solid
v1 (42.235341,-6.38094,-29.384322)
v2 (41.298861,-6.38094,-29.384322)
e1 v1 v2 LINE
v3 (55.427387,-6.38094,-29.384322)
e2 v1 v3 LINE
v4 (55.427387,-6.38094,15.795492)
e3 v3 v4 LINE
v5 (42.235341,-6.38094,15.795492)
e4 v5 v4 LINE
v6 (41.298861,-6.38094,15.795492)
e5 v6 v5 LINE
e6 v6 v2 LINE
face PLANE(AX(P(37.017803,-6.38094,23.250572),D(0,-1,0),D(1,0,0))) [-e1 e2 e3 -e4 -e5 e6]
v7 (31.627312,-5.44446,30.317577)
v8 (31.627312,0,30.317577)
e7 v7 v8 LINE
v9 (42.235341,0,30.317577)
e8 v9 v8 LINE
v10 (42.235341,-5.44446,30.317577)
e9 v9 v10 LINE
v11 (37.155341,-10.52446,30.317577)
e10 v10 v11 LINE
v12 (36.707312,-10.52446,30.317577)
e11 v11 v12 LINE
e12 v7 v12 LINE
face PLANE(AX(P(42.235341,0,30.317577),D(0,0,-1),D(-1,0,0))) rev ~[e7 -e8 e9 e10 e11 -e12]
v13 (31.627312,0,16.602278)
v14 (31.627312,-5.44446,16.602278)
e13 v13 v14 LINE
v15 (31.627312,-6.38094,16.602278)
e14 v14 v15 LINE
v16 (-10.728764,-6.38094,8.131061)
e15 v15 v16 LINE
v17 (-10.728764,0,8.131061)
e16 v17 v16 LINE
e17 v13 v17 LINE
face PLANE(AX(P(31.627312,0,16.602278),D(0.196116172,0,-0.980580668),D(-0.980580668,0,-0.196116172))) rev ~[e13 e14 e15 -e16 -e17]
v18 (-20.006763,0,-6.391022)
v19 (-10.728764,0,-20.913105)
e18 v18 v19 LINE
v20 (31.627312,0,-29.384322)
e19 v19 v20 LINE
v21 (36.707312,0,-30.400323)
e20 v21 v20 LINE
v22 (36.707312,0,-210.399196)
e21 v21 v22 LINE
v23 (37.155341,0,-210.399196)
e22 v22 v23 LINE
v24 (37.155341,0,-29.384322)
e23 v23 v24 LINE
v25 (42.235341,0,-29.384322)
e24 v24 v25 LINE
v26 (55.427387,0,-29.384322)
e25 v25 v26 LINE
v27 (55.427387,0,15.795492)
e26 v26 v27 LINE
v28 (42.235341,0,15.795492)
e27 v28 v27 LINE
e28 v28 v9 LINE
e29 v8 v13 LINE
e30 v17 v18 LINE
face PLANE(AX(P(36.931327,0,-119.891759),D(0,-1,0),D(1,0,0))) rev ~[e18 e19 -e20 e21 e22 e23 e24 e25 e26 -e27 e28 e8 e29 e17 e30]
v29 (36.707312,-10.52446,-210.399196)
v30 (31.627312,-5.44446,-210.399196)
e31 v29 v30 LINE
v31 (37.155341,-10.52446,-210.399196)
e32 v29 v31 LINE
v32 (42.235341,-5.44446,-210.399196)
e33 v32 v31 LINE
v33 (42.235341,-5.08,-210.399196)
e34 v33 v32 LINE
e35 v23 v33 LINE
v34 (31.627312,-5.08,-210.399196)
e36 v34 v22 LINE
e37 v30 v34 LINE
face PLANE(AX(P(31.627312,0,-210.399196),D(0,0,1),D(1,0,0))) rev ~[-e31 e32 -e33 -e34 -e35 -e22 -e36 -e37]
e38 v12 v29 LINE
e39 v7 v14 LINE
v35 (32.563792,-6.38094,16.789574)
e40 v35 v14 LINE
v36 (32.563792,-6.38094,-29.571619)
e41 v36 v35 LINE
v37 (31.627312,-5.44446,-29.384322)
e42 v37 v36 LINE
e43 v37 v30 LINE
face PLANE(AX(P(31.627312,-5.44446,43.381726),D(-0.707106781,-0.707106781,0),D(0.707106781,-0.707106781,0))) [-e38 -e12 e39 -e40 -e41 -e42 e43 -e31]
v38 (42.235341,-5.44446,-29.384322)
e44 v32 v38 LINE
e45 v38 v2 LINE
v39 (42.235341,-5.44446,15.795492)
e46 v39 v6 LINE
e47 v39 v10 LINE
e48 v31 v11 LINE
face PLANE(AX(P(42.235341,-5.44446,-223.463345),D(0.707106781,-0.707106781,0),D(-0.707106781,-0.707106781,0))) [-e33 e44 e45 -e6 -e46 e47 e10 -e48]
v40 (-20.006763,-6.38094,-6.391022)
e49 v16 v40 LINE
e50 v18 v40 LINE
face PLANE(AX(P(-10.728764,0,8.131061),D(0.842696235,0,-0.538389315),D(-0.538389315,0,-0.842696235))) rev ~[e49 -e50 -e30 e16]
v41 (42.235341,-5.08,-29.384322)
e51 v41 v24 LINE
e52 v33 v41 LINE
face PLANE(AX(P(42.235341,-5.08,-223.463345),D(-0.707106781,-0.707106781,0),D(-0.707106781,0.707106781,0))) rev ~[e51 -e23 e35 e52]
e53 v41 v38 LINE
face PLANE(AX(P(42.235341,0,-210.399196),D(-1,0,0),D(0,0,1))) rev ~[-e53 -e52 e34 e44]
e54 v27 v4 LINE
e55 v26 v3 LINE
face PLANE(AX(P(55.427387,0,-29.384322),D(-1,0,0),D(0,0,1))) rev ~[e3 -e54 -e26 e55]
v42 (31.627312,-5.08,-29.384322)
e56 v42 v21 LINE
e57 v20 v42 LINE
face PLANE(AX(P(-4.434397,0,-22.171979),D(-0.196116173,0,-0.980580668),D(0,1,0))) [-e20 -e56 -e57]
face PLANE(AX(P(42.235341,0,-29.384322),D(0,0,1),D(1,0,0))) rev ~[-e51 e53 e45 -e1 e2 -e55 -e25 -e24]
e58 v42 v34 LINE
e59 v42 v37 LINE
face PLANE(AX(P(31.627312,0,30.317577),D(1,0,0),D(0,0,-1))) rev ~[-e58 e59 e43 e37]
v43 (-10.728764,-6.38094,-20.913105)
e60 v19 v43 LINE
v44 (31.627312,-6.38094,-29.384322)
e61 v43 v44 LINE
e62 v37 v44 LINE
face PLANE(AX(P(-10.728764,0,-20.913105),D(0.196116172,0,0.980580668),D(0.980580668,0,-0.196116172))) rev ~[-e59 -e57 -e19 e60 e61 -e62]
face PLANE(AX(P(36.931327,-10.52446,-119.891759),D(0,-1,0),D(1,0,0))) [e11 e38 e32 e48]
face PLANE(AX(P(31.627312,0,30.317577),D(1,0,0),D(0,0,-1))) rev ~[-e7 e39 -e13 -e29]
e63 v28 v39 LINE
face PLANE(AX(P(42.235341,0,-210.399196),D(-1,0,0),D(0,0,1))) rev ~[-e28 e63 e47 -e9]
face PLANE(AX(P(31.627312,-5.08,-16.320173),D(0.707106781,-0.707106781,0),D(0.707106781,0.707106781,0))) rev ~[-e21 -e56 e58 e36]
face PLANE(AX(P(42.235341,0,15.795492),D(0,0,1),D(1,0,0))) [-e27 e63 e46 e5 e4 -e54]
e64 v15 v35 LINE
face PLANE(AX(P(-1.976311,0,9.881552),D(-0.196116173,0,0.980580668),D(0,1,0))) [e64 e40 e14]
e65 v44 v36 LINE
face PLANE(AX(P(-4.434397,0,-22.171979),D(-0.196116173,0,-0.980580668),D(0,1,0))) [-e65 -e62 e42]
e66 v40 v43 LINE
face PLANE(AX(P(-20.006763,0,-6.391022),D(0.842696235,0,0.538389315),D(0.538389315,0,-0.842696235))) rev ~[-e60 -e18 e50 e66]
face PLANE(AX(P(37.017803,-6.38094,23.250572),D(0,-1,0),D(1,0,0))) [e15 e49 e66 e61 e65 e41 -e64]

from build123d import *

# Parameters (mm, degrees)
F0_W         = 10.6080286205
F0_H         = 181.0148730874
F1_DEPTH     = 10.52446
F0_W_2       = 13.1920464337
F0_H_2       = 45.1798141003
F2_DEPTH     = 6.38094
F3_T1_DEPTH  = 194.0790226663
F3_T6_DEPTH  = 266.8450713117
F3_T12_DEPTH = 266.8450713117
F3_T18_DEPTH = 266.8450713117
F3_T25_DEPTH = 266.8450713117
F3_T31_DEPTH = 266.8450713117
F3_T37_DEPTH = 266.8450713117
F3_T43_DEPTH = 266.8450713117
F3_T49_DEPTH = 266.8450713117
F3_T56_DEPTH = 266.8450713117
F3_T62_DEPTH = 266.8450713117
F3_T68_DEPTH = 207.1431722451


# Not quite as in the source:
# - a fillet or chamfer that OpenCascade refuses, or shapes differently, is made with other operations: its cross-section is extruded or revolved along the edge and cut away or added


with BuildPart() as f1:
    # F0 (on Front) → F1 (new body)
    with BuildSketch(Plane.XZ):
        with Locations((36.9313266128, -119.8917590082)):
            Rectangle(F0_W, F0_H)
        Polygon((42.2353409231, 15.7954916358), (42.2353409231, 30.3175766021), (31.6273123026, 30.3175766021), (31.6273123026, 16.6022777557), align=None)
        Polygon((42.2353409231, -29.3843224645), (42.2353409231, 15.7954916358), (31.6273123026, 16.6022777557), (31.6273123026, -29.3843224645), align=None)
    extrude(amount=F1_DEPTH)

    # F0 (on Front) → F2 (join)
    with BuildSketch(Plane.XZ):
        Polygon((42.2353409231, 15.7954916358), (42.2353409231, 30.3175766021), (31.6273123026, 30.3175766021), (31.6273123026, 16.6022777557), align=None)
        with Locations((48.8313641399, -6.7944154143)):
            Rectangle(F0_W_2, F0_H_2)
        Polygon((42.2353409231, -29.3843224645), (42.2353409231, 15.7954916358), (31.6273123026, 16.6022777557), (31.6273123026, -29.3843224645), align=None)
        with Locations((36.9313266128, -119.8917590082)):
            Rectangle(F0_W, F0_H)
        Polygon((31.6273123026, -29.3843224645), (31.6273123026, 16.6022777557), (-10.7287643477, 8.1310607493), (-20.0067628175, -6.3910223544), (-10.7287643477, -20.913105458), align=None)
    extrude(amount=F2_DEPTH)

    # F3: chamfer of 5.08 on 4 edges, made by hand

    # F3_s2 → F3_t1 (cut)
    with BuildSketch(Plane.XY.offset(-223.4633451307)):
        Polygon((42.2353409231, -5.08), (37.1553409231, 0), (42.2353409231, 0), align=None)
    extrude(amount=F3_T1_DEPTH, mode=Mode.SUBTRACT)


with BuildPart() as f3_tool4:
    # F3_s5 → F3_t6 (new body)
    with BuildSketch(Plane.XY.offset(-223.4633451307)):
        Polygon((42.2353409231, -5.44446), (37.1553409231, -10.52446), (42.2353409231, -10.52446), align=None)
    extrude(amount=F3_T6_DEPTH)

    split(bisect_by=Plane.XZ.offset(6.38094), keep=Keep.BOTTOM)

    split(bisect_by=Plane.XY.offset(-29.3843224645), keep=Keep.BOTTOM)


with BuildPart() as f1_1:
    add(f1.part)

    # F3_t3: cut F3_tool4
    add(f3_tool4.part, mode=Mode.SUBTRACT)


with BuildPart() as f3_tool10:
    # F3_s11 → F3_t12 (new body)
    with BuildSketch(Plane.XY.offset(-223.4633451307)):
        Polygon((42.2353409231, -5.44446), (37.1553409231, -10.52446), (42.2353409231, -10.52446), align=None)
    extrude(amount=F3_T12_DEPTH)

    split(bisect_by=Plane.XZ.offset(6.38094), keep=Keep.TOP)

    split(bisect_by=Plane.XY.offset(-29.3843224645), keep=Keep.BOTTOM)


with BuildPart() as f1_2:
    add(f1_1.part)

    # F3_t9: cut F3_tool10
    add(f3_tool10.part, mode=Mode.SUBTRACT)


with BuildPart() as f3_tool16:
    # F3_s17 → F3_t18 (new body)
    with BuildSketch(Plane.XY.offset(-223.4633451307)):
        Polygon((42.2353409231, -5.44446), (37.1553409231, -10.52446), (42.2353409231, -10.52446), align=None)
    extrude(amount=F3_T18_DEPTH)

    split(bisect_by=Plane.XY.offset(15.7954916358), keep=Keep.BOTTOM)

    split(bisect_by=Plane.XZ.offset(6.38094), keep=Keep.TOP)

    split(bisect_by=Plane.XY.offset(-29.3843224645), keep=Keep.TOP)


with BuildPart() as f1_3:
    add(f1_2.part)

    # F3_t15: cut F3_tool16
    add(f3_tool16.part, mode=Mode.SUBTRACT)


with BuildPart() as f3_tool23:
    # F3_s24 → F3_t25 (new body)
    with BuildSketch(Plane.XY.offset(-223.4633451307)):
        Polygon((42.2353409231, -5.44446), (37.1553409231, -10.52446), (42.2353409231, -10.52446), align=None)
    extrude(amount=F3_T25_DEPTH)

    split(bisect_by=Plane.XY.offset(15.7954916358), keep=Keep.TOP)

    split(bisect_by=Plane.XZ.offset(6.38094), keep=Keep.BOTTOM)


with BuildPart() as f1_4:
    add(f1_3.part)

    # F3_t22: cut F3_tool23
    add(f3_tool23.part, mode=Mode.SUBTRACT)


with BuildPart() as f3_tool29:
    # F3_s30 → F3_t31 (new body)
    with BuildSketch(Plane.XY.offset(-223.4633451307)):
        Polygon((42.2353409231, -5.44446), (37.1553409231, -10.52446), (42.2353409231, -10.52446), align=None)
    extrude(amount=F3_T31_DEPTH)

    split(bisect_by=Plane.XY.offset(15.7954916358), keep=Keep.TOP)

    split(bisect_by=Plane.XZ.offset(6.38094), keep=Keep.TOP)


with BuildPart() as f1_5:
    add(f1_4.part)

    # F3_t28: cut F3_tool29
    add(f3_tool29.part, mode=Mode.SUBTRACT)


with BuildPart() as f3_tool35:
    # F3_s36 → F3_t37 (new body)
    with BuildSketch(Plane.XY.offset(43.381726181)):
        Polygon((31.6273123026, -5.44446), (36.7073123026, -10.52446), (31.6273123026, -10.52446), align=None)
    extrude(amount=-F3_T37_DEPTH)

    split(bisect_by=Plane.XZ.offset(6.38094), keep=Keep.BOTTOM)

    split(bisect_by=Plane(origin=(-1.976310754, 0, 9.8815518144), x_dir=(0, 1, 0), z_dir=(-0.1961161725, 0, 0.9805806682)), keep=Keep.TOP)


with BuildPart() as f1_6:
    add(f1_5.part)

    # F3_t34: cut F3_tool35
    add(f3_tool35.part, mode=Mode.SUBTRACT)


with BuildPart() as f3_tool41:
    # F3_s42 → F3_t43 (new body)
    with BuildSketch(Plane.XY.offset(43.381726181)):
        Polygon((31.6273123026, -5.44446), (36.7073123026, -10.52446), (31.6273123026, -10.52446), align=None)
    extrude(amount=-F3_T43_DEPTH)

    split(bisect_by=Plane.XZ.offset(6.38094), keep=Keep.TOP)

    split(bisect_by=Plane(origin=(-1.976310754, 0, 9.8815518144), x_dir=(0, 1, 0), z_dir=(-0.1961161725, 0, 0.9805806682)), keep=Keep.TOP)


with BuildPart() as f1_7:
    add(f1_6.part)

    # F3_t40: cut F3_tool41
    add(f3_tool41.part, mode=Mode.SUBTRACT)


with BuildPart() as f3_tool47:
    # F3_s48 → F3_t49 (new body)
    with BuildSketch(Plane.XY.offset(43.381726181)):
        Polygon((31.6273123026, -5.44446), (36.7073123026, -10.52446), (31.6273123026, -10.52446), align=None)
    extrude(amount=-F3_T49_DEPTH)

    split(bisect_by=Plane(origin=(-4.4343967239, 0, -22.1719792319), x_dir=(0, 1, 0), z_dir=(0.1961161725, 0, 0.9805806682)), keep=Keep.TOP)

    split(bisect_by=Plane.XZ.offset(6.38094), keep=Keep.TOP)

    split(bisect_by=Plane(origin=(-1.976310754, 0, 9.8815518144), x_dir=(0, 1, 0), z_dir=(0.1961161725, 0, -0.9805806682)), keep=Keep.TOP)


with BuildPart() as f1_8:
    add(f1_7.part)

    # F3_t46: cut F3_tool47
    add(f3_tool47.part, mode=Mode.SUBTRACT)


with BuildPart() as f3_tool54:
    # F3_s55 → F3_t56 (new body)
    with BuildSketch(Plane.XY.offset(43.381726181)):
        Polygon((31.6273123026, -5.44446), (36.7073123026, -10.52446), (31.6273123026, -10.52446), align=None)
    extrude(amount=-F3_T56_DEPTH)

    split(bisect_by=Plane(origin=(-4.4343967239, 0, -22.1719792319), x_dir=(0, 1, 0), z_dir=(-0.1961161725, 0, -0.9805806682)), keep=Keep.TOP)

    split(bisect_by=Plane.XZ.offset(6.38094), keep=Keep.BOTTOM)


with BuildPart() as f1_9:
    add(f1_8.part)

    # F3_t53: cut F3_tool54
    add(f3_tool54.part, mode=Mode.SUBTRACT)


with BuildPart() as f3_tool60:
    # F3_s61 → F3_t62 (new body)
    with BuildSketch(Plane.XY.offset(43.381726181)):
        Polygon((31.6273123026, -5.44446), (36.7073123026, -10.52446), (31.6273123026, -10.52446), align=None)
    extrude(amount=-F3_T62_DEPTH)

    split(bisect_by=Plane(origin=(-4.4343967239, 0, -22.1719792319), x_dir=(0, 1, 0), z_dir=(-0.1961161725, 0, -0.9805806682)), keep=Keep.TOP)

    split(bisect_by=Plane.XZ.offset(6.38094), keep=Keep.TOP)


with BuildPart() as f1_10:
    add(f1_9.part)

    # F3_t59: cut F3_tool60
    add(f3_tool60.part, mode=Mode.SUBTRACT)


with BuildPart() as f3_tool66:
    # F3_s67 → F3_t68 (new body)
    with BuildSketch(Plane.XY.offset(-16.3201728856)):
        Polygon((31.6273123026, -5.08), (36.7073123026, 0), (31.6273123026, 0), align=None)
    extrude(amount=-F3_T68_DEPTH)

    split(bisect_by=Plane(origin=(-4.4343967239, 0, -22.1719792319), x_dir=(0, 1, 0), z_dir=(-0.1961161725, 0, -0.9805806682)), keep=Keep.TOP)


with BuildPart() as f1_11:
    add(f1_10.part)

    # F3_t65: cut F3_tool66
    add(f3_tool66.part, mode=Mode.SUBTRACT)


solid = f1_11.part
